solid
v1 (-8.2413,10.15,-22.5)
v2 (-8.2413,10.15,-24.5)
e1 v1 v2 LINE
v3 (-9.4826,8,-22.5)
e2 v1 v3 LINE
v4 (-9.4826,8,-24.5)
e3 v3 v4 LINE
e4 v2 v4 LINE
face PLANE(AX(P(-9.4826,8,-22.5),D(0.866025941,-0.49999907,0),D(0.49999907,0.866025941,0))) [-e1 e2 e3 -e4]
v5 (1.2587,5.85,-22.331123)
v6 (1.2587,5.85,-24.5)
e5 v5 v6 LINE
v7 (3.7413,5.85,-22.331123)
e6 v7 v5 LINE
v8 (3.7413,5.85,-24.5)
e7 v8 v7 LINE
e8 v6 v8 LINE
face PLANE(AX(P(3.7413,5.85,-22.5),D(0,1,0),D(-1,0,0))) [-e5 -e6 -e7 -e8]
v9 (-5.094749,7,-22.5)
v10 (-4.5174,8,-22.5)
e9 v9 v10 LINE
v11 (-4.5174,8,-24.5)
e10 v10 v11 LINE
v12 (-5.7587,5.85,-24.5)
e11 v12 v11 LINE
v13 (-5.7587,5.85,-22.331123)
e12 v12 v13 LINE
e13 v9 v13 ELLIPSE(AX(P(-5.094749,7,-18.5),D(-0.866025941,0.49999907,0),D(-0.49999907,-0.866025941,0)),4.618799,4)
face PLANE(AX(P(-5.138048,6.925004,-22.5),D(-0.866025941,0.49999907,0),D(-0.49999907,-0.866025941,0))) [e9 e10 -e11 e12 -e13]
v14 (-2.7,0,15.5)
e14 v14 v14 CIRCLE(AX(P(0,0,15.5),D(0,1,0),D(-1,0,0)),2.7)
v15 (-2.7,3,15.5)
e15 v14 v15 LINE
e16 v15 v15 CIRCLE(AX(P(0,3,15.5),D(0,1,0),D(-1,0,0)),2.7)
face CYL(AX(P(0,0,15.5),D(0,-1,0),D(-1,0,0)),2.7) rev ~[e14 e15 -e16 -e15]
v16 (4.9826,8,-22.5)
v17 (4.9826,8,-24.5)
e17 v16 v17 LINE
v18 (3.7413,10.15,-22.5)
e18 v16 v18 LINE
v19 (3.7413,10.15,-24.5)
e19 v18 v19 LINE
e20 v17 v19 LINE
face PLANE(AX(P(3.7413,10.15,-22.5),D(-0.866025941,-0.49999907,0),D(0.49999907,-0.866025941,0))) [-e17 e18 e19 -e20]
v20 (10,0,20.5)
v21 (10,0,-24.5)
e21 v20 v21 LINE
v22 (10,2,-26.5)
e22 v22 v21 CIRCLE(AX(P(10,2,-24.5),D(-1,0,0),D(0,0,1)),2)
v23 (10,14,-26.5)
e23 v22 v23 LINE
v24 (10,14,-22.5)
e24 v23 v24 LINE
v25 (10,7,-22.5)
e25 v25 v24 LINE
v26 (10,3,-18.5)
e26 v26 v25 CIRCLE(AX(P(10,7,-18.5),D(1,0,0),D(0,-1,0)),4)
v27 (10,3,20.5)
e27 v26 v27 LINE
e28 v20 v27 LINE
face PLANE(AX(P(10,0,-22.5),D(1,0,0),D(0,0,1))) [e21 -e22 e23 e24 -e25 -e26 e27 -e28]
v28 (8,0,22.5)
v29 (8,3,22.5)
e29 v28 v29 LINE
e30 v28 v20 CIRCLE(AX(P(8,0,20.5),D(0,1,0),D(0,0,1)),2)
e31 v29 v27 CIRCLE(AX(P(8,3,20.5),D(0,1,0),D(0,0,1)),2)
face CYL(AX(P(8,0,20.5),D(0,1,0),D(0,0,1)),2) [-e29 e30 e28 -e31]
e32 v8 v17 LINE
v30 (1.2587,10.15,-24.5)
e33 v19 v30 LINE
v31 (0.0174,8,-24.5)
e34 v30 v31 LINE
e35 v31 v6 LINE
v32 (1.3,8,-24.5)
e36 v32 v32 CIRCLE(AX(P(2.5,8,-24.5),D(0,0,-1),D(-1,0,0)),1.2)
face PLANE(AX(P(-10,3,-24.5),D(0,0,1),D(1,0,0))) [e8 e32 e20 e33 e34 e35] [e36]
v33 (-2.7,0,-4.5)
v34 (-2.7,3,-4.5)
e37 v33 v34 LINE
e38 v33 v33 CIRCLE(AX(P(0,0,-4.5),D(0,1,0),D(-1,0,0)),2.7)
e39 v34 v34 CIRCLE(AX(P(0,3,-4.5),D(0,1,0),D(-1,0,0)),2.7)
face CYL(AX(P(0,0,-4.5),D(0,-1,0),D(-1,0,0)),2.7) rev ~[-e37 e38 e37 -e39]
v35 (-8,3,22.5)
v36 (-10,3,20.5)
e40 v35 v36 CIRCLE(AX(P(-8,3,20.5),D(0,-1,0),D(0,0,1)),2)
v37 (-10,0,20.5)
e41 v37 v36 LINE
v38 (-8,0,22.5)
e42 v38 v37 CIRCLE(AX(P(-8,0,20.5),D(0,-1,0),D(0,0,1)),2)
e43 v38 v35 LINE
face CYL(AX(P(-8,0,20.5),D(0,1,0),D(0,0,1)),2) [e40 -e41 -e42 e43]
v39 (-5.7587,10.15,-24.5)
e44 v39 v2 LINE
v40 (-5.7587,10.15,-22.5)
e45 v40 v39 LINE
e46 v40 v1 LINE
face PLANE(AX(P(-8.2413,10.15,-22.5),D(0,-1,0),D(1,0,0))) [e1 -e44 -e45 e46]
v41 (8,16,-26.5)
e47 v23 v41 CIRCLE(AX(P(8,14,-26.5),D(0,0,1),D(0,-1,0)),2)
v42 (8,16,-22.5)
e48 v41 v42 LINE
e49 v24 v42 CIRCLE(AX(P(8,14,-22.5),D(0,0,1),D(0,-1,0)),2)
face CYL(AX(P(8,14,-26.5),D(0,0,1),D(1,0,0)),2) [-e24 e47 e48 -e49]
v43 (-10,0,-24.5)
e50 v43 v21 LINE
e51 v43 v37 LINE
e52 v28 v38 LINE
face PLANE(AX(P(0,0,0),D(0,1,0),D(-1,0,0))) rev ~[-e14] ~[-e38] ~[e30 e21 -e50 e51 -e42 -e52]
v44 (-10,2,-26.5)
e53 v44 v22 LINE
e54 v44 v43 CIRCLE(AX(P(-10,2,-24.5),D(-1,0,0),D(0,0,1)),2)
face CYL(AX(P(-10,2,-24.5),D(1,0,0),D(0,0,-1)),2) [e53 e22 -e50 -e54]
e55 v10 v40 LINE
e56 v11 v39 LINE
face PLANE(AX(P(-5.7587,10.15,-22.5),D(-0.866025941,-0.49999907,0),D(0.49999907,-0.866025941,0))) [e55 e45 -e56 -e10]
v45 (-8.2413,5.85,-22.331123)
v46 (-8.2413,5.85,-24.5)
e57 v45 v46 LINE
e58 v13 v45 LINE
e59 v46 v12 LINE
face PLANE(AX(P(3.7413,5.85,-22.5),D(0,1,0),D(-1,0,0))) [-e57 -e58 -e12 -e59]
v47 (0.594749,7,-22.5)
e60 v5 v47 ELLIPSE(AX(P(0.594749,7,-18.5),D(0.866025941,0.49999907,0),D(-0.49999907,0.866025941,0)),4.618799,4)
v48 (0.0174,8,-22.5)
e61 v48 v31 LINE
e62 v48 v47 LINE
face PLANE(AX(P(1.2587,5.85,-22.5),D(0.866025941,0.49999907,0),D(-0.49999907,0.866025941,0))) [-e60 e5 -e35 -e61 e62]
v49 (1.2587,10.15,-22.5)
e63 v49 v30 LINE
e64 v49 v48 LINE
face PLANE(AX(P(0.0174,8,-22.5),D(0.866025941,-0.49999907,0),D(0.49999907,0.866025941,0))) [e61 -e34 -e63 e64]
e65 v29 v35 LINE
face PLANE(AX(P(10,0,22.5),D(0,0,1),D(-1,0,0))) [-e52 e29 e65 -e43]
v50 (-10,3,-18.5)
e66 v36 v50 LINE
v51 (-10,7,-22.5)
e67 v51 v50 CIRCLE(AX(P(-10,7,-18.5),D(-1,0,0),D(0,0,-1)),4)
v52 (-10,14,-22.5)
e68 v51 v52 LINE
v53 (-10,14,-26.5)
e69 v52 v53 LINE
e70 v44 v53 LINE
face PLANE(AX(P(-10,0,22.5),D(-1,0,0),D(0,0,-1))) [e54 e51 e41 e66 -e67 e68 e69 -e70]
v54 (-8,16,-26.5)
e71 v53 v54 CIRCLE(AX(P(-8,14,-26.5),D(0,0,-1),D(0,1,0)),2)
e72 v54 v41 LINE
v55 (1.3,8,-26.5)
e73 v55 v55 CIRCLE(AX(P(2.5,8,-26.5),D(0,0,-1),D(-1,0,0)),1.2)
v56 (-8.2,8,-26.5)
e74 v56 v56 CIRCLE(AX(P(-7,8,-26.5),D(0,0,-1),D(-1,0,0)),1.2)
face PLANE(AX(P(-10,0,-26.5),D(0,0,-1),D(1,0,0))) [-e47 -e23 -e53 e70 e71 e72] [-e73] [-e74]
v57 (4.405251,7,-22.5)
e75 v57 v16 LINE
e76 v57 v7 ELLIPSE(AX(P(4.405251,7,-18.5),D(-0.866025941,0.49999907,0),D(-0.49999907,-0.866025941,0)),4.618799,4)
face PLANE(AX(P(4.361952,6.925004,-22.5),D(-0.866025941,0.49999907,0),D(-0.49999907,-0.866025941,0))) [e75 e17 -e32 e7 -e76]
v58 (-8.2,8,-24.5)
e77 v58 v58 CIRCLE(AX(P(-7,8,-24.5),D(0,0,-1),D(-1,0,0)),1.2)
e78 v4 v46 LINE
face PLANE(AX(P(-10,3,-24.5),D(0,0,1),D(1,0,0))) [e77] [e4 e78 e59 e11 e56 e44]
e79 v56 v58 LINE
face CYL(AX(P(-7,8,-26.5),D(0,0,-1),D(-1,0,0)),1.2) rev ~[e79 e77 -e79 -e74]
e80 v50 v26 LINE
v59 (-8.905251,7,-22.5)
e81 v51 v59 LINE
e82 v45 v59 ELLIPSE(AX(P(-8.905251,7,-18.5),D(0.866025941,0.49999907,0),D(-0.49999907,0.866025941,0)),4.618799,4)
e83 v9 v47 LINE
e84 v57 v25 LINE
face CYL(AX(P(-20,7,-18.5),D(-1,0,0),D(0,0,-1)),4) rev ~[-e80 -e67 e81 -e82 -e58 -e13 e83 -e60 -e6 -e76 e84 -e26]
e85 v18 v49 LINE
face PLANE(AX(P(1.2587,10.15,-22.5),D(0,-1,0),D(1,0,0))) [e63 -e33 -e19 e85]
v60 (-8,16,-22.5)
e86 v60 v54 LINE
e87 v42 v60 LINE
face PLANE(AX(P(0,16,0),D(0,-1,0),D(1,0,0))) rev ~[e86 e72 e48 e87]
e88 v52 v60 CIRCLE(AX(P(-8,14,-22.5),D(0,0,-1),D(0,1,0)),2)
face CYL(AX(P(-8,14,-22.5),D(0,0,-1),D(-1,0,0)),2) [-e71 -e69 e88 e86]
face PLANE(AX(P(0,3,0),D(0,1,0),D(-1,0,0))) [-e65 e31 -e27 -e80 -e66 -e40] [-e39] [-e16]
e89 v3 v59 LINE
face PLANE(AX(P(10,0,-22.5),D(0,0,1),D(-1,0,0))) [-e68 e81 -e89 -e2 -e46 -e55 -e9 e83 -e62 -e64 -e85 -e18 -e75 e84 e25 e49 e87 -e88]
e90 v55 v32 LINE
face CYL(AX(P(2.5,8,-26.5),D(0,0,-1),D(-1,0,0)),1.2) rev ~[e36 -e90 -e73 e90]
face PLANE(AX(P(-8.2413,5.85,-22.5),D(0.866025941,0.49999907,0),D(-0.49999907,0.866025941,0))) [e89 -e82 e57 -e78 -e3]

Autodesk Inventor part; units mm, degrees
ref_plane "YZ Plane" through (0, 0, 0) normal (1, 0, 0) x (0, 1, 0)
ref_plane "XZ Plane" through (0, 0, 0) normal (0, 1, 0) x (-1, 0, 0)
ref_plane "XY Plane" through (0, 0, 0) normal (0, 0, 1) x (1, 0, 0)
sketch "Boceto1" plane through (0, 0, 0) normal (0, 1, 0) x (-1, 0, 0)
  line L0 (-10, 22.5) -> (10, 22.5)
  line L1 (10, 22.5) -> (10, -22.5)
  line L2 (10, -22.5) -> (-10, -22.5)
  line L3 (-10, -22.5) -> (-10, 22.5)
  line L4 (-10, 22.5) -> (10, -22.5) construction
  line L5 (10, 22.5) -> (-10, -22.5) construction
  circle A0 centre (0, 15.5) radius 2.7
  circle A1 centre (0, -4.5) radius 2.7
  point P0 (0, 0)
  point P1 (0, 0)
  dimension "d0" = 5.4
  dimension "d1" = 5.4
  dimension "d2" = 45
  dimension "d3" = 20
  dimension "d21" = 20
  dimension "d22" = 7
extrude "Extrusión1" add sketch "Boceto1" along normal blind 3
sketch "Boceto2" plane through (0, 0, 0) normal (0, -1, 0) x (1, 0, 0)
  line L0 (10, -22.5) -> (-10, -22.5) projected
  line L1 (10, -22.5) -> (-10, -22.5)
  line L2 (-10, -22.5) -> (-10, -26.5)
  line L3 (-10, -26.5) -> (10, -26.5)
  line L4 (10, -26.5) -> (10, -22.5)
  line L5 (-10, -22.5) -> (-10, 22.5) projected
  point P0 (0, 0)
  dimension "d8" = 4
extrude "Extrusión2" add sketch "Boceto2" against normal blind 16
sketch "Boceto3" plane through (10, 0, -26.5) normal (0, 0, -1) x (-1, 0, 0)
  circle A0 centre (7.5, 8) radius 1.2
  circle A1 centre (17, 8) radius 1.2
  line L0 (20, 0) -> (20, 16) projected
  line L1 (0, 16) -> (20, 16) projected
  point P0 (10, 0)
  dimension "d11" = 9.5
  dimension "d12" = 2.4
  dimension "d13" = 3
  dimension "d16" = 8
extrude "Extrusión3" cut sketch "Boceto3" against normal blind 20
sketch "Boceto4" plane through (-10, 3, -22.5) normal (0, 0, 1) x (1, 0, 0)
  circle A0 centre (12.5, 5) radius 1.2 projected
  line L0 (14.9826, 5) -> (13.7413, 2.85)
  line L1 (13.7413, 2.85) -> (11.2587, 2.85)
  line L2 (11.2587, 2.85) -> (10.0174, 5)
  line L3 (10.0174, 5) -> (11.2587, 7.15)
  line L4 (11.2587, 7.15) -> (13.7413, 7.15)
  line L5 (13.7413, 7.15) -> (14.9826, 5)
  circle A1 centre (3, 5) radius 1.2 projected
  line L6 (5.4826, 5) -> (4.2413, 2.85)
  line L7 (4.2413, 2.85) -> (1.7587, 2.85)
  line L8 (1.7587, 2.85) -> (0.5174, 5)
  line L9 (0.5174, 5) -> (1.7587, 7.15)
  line L10 (1.7587, 7.15) -> (4.2413, 7.15)
  line L11 (4.2413, 7.15) -> (5.4826, 5)
  circle A2 centre (12.5, 5) radius 2.15
  circle A3 centre (3, 5) radius 2.15
  point P0 (10, -3)
  dimension "d17" = 4.3
extrude "Extrusión4" cut sketch "Boceto4" against normal blind 2 contours A0 | L0 A2 L5 | L0 L1 A2 | A2 | A2 L4 L5 | L1 L2 A2 | A2 L3 L4 | L2 L3 A2 | A1 | L6 A3 L11 | L6 L7 A3 | A3 | A3 L10 L11 | L7 L8 A3 | A3 L9 L10 | L8 L9 A3
fillet "Empalme1" radius 2 2 edges at (-10, 1.5, 22.5) (10, 1.5, 22.5)
fillet "Empalme2" radius 2 2 edges at (-10, 16, -24.5) (10, 16, -24.5)
fillet "Empalme3" radius 2 1 edges at (0, 0, -26.5)
fillet "Empalme4" radius 4 1 edges at (0, 3, -22.5)
properties part number "zupportenstop"
